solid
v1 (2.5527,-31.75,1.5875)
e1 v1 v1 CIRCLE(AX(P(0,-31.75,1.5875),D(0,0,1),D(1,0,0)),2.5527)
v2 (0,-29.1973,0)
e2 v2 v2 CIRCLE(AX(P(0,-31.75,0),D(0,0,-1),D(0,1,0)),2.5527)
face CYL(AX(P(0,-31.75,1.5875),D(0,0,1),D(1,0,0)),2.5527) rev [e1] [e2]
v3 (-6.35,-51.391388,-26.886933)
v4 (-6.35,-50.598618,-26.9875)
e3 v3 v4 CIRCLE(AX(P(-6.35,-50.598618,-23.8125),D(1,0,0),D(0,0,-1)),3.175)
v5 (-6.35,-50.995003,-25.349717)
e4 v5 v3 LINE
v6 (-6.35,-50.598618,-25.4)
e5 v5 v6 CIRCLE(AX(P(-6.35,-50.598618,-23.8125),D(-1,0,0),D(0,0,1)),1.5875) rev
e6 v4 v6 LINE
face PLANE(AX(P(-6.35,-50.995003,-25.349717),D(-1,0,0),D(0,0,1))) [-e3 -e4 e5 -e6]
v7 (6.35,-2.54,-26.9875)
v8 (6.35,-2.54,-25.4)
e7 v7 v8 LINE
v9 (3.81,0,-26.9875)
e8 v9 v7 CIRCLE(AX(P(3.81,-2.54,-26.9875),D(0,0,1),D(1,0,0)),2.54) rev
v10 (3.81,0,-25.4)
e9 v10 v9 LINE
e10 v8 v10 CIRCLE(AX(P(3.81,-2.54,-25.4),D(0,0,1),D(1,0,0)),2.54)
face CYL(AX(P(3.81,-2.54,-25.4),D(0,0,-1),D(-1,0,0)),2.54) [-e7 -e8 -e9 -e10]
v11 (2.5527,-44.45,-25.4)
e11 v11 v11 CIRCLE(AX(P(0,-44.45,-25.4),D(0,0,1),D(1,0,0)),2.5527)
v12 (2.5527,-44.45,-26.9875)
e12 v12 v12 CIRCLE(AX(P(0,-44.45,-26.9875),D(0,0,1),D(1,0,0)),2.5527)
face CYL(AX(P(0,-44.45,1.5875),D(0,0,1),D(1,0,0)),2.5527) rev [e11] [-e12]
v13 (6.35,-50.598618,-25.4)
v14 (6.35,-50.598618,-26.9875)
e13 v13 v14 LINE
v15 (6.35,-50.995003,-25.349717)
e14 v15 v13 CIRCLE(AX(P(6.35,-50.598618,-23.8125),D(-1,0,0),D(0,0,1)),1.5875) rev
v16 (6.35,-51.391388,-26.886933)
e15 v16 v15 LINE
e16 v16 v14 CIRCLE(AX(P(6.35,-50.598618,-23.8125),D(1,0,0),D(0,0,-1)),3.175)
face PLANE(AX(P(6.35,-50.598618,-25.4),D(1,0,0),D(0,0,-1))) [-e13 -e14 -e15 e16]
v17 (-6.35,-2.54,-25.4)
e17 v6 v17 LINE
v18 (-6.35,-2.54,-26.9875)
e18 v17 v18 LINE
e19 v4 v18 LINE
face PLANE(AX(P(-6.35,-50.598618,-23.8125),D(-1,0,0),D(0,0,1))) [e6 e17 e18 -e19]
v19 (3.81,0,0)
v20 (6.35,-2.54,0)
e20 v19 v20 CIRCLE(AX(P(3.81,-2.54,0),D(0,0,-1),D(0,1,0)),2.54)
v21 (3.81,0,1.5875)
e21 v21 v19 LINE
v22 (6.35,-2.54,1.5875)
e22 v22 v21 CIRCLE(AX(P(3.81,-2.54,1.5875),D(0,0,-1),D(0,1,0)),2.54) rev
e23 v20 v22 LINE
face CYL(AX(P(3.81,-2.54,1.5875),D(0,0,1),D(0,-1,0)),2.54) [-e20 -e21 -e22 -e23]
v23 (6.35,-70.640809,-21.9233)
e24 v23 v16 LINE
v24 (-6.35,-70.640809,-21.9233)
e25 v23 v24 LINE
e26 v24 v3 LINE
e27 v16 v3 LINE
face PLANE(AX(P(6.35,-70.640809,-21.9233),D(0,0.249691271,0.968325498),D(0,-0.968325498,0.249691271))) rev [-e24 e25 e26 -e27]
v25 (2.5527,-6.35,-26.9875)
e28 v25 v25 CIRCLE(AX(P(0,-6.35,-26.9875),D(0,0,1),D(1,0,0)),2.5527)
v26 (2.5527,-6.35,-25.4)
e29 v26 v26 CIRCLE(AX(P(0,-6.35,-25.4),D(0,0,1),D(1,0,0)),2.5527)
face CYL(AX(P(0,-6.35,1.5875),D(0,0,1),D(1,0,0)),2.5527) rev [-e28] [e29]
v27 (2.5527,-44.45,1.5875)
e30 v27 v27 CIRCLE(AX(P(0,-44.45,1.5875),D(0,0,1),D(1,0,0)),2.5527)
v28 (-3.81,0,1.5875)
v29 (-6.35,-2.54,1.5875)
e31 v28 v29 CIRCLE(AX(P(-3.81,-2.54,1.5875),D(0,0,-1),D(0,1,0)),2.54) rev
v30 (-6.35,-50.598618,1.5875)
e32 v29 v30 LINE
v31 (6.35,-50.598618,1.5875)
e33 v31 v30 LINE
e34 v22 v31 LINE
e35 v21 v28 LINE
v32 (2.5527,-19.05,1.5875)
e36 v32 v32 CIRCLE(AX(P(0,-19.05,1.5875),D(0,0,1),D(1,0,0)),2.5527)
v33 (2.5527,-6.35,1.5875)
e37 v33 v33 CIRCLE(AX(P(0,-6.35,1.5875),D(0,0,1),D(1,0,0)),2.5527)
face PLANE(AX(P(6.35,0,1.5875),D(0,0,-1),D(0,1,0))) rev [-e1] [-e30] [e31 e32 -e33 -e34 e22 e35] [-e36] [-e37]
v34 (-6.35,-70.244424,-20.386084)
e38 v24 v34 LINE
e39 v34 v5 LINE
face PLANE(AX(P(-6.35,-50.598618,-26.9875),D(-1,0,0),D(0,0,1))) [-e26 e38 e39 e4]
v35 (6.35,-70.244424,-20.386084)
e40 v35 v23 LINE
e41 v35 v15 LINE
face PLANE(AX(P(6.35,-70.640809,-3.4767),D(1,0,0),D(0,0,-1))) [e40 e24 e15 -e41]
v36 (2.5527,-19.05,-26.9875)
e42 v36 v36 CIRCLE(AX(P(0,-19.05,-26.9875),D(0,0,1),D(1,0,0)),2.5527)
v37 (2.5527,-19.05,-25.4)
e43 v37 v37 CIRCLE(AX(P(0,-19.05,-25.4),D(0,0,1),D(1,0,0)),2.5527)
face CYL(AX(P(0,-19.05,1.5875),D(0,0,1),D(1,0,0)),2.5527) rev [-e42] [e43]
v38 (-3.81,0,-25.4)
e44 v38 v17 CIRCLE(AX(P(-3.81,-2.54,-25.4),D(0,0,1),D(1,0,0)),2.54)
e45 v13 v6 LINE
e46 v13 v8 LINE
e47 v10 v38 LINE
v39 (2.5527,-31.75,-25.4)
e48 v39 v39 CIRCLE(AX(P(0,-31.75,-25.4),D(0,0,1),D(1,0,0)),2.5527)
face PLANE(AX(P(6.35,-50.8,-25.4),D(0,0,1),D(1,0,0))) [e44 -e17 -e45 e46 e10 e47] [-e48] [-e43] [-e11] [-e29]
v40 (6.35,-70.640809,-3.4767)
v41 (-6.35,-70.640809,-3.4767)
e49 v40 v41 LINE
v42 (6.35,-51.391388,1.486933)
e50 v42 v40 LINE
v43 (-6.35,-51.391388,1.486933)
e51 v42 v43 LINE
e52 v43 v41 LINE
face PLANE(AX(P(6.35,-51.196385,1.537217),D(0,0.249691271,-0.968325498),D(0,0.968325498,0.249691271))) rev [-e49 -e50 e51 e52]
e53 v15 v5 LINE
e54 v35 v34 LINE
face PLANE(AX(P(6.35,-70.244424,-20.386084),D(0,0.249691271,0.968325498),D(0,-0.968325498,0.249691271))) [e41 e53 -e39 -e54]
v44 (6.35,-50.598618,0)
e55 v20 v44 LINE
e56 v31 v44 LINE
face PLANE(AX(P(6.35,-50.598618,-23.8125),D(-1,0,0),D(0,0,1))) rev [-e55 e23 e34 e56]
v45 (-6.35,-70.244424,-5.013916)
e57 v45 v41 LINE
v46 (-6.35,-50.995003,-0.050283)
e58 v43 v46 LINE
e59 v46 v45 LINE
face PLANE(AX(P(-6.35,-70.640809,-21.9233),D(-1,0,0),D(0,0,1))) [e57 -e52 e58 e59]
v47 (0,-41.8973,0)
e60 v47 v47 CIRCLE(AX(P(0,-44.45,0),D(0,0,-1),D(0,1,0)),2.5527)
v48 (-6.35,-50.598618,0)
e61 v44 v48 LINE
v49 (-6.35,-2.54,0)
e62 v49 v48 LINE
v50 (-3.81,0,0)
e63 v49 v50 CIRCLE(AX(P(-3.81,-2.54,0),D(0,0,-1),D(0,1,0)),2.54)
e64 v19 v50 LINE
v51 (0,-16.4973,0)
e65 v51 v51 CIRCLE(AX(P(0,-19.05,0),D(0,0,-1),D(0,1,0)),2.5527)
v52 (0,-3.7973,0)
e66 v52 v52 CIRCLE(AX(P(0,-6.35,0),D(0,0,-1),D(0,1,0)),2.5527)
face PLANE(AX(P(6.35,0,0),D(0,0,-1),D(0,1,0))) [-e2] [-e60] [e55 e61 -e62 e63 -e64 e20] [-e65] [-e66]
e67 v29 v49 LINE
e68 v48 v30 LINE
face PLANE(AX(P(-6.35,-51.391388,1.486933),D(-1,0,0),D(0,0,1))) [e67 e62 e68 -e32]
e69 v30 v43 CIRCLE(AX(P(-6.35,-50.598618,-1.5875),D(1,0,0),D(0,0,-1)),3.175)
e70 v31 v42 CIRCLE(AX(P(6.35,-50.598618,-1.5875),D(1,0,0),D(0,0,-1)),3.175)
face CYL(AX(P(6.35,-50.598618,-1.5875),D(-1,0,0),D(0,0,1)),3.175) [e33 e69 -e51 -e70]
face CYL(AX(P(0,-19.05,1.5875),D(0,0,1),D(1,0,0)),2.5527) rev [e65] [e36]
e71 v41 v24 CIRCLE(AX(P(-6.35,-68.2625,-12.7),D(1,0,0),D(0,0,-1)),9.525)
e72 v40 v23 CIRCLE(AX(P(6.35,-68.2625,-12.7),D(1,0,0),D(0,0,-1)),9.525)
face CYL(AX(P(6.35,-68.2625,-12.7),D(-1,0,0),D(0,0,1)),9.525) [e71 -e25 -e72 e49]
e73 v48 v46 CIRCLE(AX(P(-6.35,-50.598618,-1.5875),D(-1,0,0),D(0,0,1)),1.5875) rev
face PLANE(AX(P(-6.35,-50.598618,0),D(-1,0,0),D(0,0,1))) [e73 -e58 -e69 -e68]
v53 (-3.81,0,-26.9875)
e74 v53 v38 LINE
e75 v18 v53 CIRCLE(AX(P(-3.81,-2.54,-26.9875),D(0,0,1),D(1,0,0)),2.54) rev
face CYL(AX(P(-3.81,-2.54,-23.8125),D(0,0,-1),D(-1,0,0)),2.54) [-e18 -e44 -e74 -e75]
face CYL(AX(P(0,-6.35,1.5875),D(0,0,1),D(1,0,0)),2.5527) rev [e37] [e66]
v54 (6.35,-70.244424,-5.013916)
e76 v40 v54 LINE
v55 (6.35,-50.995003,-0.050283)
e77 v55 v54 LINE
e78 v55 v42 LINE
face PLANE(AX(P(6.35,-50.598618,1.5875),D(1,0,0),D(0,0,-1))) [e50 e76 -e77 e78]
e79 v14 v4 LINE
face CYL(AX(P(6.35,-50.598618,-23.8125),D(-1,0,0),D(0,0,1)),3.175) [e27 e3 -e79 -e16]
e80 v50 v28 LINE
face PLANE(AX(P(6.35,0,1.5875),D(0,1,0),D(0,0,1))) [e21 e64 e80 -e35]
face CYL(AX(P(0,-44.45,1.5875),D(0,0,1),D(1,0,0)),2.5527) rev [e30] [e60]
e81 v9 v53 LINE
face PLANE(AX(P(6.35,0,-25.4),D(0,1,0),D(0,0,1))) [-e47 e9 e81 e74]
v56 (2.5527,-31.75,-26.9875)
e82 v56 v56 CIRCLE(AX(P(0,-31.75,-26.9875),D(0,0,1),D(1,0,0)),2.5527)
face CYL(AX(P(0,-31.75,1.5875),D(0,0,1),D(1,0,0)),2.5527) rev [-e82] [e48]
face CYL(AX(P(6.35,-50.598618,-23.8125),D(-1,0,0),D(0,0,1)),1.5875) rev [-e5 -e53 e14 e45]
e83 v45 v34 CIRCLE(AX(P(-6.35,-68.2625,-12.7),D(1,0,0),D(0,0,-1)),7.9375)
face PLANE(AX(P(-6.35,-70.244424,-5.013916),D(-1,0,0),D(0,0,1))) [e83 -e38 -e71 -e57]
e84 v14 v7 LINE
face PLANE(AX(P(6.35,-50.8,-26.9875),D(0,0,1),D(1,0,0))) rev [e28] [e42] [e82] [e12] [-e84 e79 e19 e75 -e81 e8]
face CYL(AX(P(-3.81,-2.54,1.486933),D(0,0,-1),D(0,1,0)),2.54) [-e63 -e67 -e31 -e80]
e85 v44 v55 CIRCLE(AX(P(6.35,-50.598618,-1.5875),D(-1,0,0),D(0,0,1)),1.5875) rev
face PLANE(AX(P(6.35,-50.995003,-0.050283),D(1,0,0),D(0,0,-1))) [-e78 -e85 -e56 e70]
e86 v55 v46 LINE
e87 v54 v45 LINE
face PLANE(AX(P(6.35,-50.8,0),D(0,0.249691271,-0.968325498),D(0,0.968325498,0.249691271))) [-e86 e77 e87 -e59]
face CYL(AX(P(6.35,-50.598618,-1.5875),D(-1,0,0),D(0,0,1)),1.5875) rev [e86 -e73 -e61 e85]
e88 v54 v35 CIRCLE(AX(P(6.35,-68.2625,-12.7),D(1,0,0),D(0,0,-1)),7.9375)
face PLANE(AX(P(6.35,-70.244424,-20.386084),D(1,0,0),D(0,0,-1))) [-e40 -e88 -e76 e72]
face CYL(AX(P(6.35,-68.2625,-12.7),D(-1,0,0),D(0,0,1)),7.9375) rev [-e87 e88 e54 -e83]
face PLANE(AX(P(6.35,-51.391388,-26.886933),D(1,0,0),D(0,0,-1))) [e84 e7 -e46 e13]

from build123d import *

# Parameters (mm, degrees)
BASE_FLANGE1_DEPTH     = 6.35
F_10_CLEARANCE_HOLE1_D = 5.1054
FILLET1_R              = 2.54


# Sheet-metal steps are written as plain solids
with BuildPart() as part:
    # Sketch1 → Base-Flange1 (new, symmetric)
    with BuildSketch(Plane(origin=(0, 0, 0), x_dir=(0, 0, -1), z_dir=(1, 0, 0))):
        with BuildLine():
            Line((0, 0), (0, -50.59861822))
            ThreePointArc((0, -50.59861822), (0.012620988, -50.798398969), (0.050283273, -50.995003112))
            Line((0.050283273, -50.995003112), (5.013916363, -70.244424463))
            ThreePointArc((5.013916363, -70.244424463), (12.7, -76.2), (20.386083637, -70.244424463))
            Line((20.386083637, -70.244424463), (25.349716727, -50.995003112))
            ThreePointArc((25.349716727, -50.995003112), (25.387379012, -50.798398969), (25.4, -50.59861822))
            Line((25.4, -50.59861822), (25.4, 0))
            Line((25.4, 0), (26.9875, 0))
            Line((26.9875, 0), (26.9875, -50.59861822))
            ThreePointArc((26.9875, -50.59861822), (26.962258024, -50.998179718), (26.886933455, -51.391388005))
            Line((26.886933455, -51.391388005), (21.923300364, -70.640809356))
            ThreePointArc((21.923300364, -70.640809356), (12.7, -77.7875), (3.476699636, -70.640809356))
            Line((3.476699636, -70.640809356), (-1.486933455, -51.391388005))
            ThreePointArc((-1.486933455, -51.391388005), (-1.562258024, -50.998179718), (-1.5875, -50.59861822))
            Line((-1.5875, -50.59861822), (-1.5875, 0))
            Line((-1.5875, 0), (0, 0))
        make_face()
    extrude(amount=BASE_FLANGE1_DEPTH, both=True)

    # #10 Clearance Hole1 (through all)
    with Locations(Plane.XY.offset(1.5875)):
        with Locations((0, -6.35), (0, -19.05), (0, -31.75), (0, -44.45)):
            Hole(F_10_CLEARANCE_HOLE1_D / 2)

    # Fillet1
    fillet1_edges = [part.edges().sort_by_distance(p)[0] for p in [
        (-6.35, 0, 0.79375),
        (-6.35, 0, -26.19375),
        (6.35, 0, 0.79375),
        (6.35, 0, -26.19375),
    ]]
    fillet(fillet1_edges, radius=FILLET1_R)


solid = part.part
